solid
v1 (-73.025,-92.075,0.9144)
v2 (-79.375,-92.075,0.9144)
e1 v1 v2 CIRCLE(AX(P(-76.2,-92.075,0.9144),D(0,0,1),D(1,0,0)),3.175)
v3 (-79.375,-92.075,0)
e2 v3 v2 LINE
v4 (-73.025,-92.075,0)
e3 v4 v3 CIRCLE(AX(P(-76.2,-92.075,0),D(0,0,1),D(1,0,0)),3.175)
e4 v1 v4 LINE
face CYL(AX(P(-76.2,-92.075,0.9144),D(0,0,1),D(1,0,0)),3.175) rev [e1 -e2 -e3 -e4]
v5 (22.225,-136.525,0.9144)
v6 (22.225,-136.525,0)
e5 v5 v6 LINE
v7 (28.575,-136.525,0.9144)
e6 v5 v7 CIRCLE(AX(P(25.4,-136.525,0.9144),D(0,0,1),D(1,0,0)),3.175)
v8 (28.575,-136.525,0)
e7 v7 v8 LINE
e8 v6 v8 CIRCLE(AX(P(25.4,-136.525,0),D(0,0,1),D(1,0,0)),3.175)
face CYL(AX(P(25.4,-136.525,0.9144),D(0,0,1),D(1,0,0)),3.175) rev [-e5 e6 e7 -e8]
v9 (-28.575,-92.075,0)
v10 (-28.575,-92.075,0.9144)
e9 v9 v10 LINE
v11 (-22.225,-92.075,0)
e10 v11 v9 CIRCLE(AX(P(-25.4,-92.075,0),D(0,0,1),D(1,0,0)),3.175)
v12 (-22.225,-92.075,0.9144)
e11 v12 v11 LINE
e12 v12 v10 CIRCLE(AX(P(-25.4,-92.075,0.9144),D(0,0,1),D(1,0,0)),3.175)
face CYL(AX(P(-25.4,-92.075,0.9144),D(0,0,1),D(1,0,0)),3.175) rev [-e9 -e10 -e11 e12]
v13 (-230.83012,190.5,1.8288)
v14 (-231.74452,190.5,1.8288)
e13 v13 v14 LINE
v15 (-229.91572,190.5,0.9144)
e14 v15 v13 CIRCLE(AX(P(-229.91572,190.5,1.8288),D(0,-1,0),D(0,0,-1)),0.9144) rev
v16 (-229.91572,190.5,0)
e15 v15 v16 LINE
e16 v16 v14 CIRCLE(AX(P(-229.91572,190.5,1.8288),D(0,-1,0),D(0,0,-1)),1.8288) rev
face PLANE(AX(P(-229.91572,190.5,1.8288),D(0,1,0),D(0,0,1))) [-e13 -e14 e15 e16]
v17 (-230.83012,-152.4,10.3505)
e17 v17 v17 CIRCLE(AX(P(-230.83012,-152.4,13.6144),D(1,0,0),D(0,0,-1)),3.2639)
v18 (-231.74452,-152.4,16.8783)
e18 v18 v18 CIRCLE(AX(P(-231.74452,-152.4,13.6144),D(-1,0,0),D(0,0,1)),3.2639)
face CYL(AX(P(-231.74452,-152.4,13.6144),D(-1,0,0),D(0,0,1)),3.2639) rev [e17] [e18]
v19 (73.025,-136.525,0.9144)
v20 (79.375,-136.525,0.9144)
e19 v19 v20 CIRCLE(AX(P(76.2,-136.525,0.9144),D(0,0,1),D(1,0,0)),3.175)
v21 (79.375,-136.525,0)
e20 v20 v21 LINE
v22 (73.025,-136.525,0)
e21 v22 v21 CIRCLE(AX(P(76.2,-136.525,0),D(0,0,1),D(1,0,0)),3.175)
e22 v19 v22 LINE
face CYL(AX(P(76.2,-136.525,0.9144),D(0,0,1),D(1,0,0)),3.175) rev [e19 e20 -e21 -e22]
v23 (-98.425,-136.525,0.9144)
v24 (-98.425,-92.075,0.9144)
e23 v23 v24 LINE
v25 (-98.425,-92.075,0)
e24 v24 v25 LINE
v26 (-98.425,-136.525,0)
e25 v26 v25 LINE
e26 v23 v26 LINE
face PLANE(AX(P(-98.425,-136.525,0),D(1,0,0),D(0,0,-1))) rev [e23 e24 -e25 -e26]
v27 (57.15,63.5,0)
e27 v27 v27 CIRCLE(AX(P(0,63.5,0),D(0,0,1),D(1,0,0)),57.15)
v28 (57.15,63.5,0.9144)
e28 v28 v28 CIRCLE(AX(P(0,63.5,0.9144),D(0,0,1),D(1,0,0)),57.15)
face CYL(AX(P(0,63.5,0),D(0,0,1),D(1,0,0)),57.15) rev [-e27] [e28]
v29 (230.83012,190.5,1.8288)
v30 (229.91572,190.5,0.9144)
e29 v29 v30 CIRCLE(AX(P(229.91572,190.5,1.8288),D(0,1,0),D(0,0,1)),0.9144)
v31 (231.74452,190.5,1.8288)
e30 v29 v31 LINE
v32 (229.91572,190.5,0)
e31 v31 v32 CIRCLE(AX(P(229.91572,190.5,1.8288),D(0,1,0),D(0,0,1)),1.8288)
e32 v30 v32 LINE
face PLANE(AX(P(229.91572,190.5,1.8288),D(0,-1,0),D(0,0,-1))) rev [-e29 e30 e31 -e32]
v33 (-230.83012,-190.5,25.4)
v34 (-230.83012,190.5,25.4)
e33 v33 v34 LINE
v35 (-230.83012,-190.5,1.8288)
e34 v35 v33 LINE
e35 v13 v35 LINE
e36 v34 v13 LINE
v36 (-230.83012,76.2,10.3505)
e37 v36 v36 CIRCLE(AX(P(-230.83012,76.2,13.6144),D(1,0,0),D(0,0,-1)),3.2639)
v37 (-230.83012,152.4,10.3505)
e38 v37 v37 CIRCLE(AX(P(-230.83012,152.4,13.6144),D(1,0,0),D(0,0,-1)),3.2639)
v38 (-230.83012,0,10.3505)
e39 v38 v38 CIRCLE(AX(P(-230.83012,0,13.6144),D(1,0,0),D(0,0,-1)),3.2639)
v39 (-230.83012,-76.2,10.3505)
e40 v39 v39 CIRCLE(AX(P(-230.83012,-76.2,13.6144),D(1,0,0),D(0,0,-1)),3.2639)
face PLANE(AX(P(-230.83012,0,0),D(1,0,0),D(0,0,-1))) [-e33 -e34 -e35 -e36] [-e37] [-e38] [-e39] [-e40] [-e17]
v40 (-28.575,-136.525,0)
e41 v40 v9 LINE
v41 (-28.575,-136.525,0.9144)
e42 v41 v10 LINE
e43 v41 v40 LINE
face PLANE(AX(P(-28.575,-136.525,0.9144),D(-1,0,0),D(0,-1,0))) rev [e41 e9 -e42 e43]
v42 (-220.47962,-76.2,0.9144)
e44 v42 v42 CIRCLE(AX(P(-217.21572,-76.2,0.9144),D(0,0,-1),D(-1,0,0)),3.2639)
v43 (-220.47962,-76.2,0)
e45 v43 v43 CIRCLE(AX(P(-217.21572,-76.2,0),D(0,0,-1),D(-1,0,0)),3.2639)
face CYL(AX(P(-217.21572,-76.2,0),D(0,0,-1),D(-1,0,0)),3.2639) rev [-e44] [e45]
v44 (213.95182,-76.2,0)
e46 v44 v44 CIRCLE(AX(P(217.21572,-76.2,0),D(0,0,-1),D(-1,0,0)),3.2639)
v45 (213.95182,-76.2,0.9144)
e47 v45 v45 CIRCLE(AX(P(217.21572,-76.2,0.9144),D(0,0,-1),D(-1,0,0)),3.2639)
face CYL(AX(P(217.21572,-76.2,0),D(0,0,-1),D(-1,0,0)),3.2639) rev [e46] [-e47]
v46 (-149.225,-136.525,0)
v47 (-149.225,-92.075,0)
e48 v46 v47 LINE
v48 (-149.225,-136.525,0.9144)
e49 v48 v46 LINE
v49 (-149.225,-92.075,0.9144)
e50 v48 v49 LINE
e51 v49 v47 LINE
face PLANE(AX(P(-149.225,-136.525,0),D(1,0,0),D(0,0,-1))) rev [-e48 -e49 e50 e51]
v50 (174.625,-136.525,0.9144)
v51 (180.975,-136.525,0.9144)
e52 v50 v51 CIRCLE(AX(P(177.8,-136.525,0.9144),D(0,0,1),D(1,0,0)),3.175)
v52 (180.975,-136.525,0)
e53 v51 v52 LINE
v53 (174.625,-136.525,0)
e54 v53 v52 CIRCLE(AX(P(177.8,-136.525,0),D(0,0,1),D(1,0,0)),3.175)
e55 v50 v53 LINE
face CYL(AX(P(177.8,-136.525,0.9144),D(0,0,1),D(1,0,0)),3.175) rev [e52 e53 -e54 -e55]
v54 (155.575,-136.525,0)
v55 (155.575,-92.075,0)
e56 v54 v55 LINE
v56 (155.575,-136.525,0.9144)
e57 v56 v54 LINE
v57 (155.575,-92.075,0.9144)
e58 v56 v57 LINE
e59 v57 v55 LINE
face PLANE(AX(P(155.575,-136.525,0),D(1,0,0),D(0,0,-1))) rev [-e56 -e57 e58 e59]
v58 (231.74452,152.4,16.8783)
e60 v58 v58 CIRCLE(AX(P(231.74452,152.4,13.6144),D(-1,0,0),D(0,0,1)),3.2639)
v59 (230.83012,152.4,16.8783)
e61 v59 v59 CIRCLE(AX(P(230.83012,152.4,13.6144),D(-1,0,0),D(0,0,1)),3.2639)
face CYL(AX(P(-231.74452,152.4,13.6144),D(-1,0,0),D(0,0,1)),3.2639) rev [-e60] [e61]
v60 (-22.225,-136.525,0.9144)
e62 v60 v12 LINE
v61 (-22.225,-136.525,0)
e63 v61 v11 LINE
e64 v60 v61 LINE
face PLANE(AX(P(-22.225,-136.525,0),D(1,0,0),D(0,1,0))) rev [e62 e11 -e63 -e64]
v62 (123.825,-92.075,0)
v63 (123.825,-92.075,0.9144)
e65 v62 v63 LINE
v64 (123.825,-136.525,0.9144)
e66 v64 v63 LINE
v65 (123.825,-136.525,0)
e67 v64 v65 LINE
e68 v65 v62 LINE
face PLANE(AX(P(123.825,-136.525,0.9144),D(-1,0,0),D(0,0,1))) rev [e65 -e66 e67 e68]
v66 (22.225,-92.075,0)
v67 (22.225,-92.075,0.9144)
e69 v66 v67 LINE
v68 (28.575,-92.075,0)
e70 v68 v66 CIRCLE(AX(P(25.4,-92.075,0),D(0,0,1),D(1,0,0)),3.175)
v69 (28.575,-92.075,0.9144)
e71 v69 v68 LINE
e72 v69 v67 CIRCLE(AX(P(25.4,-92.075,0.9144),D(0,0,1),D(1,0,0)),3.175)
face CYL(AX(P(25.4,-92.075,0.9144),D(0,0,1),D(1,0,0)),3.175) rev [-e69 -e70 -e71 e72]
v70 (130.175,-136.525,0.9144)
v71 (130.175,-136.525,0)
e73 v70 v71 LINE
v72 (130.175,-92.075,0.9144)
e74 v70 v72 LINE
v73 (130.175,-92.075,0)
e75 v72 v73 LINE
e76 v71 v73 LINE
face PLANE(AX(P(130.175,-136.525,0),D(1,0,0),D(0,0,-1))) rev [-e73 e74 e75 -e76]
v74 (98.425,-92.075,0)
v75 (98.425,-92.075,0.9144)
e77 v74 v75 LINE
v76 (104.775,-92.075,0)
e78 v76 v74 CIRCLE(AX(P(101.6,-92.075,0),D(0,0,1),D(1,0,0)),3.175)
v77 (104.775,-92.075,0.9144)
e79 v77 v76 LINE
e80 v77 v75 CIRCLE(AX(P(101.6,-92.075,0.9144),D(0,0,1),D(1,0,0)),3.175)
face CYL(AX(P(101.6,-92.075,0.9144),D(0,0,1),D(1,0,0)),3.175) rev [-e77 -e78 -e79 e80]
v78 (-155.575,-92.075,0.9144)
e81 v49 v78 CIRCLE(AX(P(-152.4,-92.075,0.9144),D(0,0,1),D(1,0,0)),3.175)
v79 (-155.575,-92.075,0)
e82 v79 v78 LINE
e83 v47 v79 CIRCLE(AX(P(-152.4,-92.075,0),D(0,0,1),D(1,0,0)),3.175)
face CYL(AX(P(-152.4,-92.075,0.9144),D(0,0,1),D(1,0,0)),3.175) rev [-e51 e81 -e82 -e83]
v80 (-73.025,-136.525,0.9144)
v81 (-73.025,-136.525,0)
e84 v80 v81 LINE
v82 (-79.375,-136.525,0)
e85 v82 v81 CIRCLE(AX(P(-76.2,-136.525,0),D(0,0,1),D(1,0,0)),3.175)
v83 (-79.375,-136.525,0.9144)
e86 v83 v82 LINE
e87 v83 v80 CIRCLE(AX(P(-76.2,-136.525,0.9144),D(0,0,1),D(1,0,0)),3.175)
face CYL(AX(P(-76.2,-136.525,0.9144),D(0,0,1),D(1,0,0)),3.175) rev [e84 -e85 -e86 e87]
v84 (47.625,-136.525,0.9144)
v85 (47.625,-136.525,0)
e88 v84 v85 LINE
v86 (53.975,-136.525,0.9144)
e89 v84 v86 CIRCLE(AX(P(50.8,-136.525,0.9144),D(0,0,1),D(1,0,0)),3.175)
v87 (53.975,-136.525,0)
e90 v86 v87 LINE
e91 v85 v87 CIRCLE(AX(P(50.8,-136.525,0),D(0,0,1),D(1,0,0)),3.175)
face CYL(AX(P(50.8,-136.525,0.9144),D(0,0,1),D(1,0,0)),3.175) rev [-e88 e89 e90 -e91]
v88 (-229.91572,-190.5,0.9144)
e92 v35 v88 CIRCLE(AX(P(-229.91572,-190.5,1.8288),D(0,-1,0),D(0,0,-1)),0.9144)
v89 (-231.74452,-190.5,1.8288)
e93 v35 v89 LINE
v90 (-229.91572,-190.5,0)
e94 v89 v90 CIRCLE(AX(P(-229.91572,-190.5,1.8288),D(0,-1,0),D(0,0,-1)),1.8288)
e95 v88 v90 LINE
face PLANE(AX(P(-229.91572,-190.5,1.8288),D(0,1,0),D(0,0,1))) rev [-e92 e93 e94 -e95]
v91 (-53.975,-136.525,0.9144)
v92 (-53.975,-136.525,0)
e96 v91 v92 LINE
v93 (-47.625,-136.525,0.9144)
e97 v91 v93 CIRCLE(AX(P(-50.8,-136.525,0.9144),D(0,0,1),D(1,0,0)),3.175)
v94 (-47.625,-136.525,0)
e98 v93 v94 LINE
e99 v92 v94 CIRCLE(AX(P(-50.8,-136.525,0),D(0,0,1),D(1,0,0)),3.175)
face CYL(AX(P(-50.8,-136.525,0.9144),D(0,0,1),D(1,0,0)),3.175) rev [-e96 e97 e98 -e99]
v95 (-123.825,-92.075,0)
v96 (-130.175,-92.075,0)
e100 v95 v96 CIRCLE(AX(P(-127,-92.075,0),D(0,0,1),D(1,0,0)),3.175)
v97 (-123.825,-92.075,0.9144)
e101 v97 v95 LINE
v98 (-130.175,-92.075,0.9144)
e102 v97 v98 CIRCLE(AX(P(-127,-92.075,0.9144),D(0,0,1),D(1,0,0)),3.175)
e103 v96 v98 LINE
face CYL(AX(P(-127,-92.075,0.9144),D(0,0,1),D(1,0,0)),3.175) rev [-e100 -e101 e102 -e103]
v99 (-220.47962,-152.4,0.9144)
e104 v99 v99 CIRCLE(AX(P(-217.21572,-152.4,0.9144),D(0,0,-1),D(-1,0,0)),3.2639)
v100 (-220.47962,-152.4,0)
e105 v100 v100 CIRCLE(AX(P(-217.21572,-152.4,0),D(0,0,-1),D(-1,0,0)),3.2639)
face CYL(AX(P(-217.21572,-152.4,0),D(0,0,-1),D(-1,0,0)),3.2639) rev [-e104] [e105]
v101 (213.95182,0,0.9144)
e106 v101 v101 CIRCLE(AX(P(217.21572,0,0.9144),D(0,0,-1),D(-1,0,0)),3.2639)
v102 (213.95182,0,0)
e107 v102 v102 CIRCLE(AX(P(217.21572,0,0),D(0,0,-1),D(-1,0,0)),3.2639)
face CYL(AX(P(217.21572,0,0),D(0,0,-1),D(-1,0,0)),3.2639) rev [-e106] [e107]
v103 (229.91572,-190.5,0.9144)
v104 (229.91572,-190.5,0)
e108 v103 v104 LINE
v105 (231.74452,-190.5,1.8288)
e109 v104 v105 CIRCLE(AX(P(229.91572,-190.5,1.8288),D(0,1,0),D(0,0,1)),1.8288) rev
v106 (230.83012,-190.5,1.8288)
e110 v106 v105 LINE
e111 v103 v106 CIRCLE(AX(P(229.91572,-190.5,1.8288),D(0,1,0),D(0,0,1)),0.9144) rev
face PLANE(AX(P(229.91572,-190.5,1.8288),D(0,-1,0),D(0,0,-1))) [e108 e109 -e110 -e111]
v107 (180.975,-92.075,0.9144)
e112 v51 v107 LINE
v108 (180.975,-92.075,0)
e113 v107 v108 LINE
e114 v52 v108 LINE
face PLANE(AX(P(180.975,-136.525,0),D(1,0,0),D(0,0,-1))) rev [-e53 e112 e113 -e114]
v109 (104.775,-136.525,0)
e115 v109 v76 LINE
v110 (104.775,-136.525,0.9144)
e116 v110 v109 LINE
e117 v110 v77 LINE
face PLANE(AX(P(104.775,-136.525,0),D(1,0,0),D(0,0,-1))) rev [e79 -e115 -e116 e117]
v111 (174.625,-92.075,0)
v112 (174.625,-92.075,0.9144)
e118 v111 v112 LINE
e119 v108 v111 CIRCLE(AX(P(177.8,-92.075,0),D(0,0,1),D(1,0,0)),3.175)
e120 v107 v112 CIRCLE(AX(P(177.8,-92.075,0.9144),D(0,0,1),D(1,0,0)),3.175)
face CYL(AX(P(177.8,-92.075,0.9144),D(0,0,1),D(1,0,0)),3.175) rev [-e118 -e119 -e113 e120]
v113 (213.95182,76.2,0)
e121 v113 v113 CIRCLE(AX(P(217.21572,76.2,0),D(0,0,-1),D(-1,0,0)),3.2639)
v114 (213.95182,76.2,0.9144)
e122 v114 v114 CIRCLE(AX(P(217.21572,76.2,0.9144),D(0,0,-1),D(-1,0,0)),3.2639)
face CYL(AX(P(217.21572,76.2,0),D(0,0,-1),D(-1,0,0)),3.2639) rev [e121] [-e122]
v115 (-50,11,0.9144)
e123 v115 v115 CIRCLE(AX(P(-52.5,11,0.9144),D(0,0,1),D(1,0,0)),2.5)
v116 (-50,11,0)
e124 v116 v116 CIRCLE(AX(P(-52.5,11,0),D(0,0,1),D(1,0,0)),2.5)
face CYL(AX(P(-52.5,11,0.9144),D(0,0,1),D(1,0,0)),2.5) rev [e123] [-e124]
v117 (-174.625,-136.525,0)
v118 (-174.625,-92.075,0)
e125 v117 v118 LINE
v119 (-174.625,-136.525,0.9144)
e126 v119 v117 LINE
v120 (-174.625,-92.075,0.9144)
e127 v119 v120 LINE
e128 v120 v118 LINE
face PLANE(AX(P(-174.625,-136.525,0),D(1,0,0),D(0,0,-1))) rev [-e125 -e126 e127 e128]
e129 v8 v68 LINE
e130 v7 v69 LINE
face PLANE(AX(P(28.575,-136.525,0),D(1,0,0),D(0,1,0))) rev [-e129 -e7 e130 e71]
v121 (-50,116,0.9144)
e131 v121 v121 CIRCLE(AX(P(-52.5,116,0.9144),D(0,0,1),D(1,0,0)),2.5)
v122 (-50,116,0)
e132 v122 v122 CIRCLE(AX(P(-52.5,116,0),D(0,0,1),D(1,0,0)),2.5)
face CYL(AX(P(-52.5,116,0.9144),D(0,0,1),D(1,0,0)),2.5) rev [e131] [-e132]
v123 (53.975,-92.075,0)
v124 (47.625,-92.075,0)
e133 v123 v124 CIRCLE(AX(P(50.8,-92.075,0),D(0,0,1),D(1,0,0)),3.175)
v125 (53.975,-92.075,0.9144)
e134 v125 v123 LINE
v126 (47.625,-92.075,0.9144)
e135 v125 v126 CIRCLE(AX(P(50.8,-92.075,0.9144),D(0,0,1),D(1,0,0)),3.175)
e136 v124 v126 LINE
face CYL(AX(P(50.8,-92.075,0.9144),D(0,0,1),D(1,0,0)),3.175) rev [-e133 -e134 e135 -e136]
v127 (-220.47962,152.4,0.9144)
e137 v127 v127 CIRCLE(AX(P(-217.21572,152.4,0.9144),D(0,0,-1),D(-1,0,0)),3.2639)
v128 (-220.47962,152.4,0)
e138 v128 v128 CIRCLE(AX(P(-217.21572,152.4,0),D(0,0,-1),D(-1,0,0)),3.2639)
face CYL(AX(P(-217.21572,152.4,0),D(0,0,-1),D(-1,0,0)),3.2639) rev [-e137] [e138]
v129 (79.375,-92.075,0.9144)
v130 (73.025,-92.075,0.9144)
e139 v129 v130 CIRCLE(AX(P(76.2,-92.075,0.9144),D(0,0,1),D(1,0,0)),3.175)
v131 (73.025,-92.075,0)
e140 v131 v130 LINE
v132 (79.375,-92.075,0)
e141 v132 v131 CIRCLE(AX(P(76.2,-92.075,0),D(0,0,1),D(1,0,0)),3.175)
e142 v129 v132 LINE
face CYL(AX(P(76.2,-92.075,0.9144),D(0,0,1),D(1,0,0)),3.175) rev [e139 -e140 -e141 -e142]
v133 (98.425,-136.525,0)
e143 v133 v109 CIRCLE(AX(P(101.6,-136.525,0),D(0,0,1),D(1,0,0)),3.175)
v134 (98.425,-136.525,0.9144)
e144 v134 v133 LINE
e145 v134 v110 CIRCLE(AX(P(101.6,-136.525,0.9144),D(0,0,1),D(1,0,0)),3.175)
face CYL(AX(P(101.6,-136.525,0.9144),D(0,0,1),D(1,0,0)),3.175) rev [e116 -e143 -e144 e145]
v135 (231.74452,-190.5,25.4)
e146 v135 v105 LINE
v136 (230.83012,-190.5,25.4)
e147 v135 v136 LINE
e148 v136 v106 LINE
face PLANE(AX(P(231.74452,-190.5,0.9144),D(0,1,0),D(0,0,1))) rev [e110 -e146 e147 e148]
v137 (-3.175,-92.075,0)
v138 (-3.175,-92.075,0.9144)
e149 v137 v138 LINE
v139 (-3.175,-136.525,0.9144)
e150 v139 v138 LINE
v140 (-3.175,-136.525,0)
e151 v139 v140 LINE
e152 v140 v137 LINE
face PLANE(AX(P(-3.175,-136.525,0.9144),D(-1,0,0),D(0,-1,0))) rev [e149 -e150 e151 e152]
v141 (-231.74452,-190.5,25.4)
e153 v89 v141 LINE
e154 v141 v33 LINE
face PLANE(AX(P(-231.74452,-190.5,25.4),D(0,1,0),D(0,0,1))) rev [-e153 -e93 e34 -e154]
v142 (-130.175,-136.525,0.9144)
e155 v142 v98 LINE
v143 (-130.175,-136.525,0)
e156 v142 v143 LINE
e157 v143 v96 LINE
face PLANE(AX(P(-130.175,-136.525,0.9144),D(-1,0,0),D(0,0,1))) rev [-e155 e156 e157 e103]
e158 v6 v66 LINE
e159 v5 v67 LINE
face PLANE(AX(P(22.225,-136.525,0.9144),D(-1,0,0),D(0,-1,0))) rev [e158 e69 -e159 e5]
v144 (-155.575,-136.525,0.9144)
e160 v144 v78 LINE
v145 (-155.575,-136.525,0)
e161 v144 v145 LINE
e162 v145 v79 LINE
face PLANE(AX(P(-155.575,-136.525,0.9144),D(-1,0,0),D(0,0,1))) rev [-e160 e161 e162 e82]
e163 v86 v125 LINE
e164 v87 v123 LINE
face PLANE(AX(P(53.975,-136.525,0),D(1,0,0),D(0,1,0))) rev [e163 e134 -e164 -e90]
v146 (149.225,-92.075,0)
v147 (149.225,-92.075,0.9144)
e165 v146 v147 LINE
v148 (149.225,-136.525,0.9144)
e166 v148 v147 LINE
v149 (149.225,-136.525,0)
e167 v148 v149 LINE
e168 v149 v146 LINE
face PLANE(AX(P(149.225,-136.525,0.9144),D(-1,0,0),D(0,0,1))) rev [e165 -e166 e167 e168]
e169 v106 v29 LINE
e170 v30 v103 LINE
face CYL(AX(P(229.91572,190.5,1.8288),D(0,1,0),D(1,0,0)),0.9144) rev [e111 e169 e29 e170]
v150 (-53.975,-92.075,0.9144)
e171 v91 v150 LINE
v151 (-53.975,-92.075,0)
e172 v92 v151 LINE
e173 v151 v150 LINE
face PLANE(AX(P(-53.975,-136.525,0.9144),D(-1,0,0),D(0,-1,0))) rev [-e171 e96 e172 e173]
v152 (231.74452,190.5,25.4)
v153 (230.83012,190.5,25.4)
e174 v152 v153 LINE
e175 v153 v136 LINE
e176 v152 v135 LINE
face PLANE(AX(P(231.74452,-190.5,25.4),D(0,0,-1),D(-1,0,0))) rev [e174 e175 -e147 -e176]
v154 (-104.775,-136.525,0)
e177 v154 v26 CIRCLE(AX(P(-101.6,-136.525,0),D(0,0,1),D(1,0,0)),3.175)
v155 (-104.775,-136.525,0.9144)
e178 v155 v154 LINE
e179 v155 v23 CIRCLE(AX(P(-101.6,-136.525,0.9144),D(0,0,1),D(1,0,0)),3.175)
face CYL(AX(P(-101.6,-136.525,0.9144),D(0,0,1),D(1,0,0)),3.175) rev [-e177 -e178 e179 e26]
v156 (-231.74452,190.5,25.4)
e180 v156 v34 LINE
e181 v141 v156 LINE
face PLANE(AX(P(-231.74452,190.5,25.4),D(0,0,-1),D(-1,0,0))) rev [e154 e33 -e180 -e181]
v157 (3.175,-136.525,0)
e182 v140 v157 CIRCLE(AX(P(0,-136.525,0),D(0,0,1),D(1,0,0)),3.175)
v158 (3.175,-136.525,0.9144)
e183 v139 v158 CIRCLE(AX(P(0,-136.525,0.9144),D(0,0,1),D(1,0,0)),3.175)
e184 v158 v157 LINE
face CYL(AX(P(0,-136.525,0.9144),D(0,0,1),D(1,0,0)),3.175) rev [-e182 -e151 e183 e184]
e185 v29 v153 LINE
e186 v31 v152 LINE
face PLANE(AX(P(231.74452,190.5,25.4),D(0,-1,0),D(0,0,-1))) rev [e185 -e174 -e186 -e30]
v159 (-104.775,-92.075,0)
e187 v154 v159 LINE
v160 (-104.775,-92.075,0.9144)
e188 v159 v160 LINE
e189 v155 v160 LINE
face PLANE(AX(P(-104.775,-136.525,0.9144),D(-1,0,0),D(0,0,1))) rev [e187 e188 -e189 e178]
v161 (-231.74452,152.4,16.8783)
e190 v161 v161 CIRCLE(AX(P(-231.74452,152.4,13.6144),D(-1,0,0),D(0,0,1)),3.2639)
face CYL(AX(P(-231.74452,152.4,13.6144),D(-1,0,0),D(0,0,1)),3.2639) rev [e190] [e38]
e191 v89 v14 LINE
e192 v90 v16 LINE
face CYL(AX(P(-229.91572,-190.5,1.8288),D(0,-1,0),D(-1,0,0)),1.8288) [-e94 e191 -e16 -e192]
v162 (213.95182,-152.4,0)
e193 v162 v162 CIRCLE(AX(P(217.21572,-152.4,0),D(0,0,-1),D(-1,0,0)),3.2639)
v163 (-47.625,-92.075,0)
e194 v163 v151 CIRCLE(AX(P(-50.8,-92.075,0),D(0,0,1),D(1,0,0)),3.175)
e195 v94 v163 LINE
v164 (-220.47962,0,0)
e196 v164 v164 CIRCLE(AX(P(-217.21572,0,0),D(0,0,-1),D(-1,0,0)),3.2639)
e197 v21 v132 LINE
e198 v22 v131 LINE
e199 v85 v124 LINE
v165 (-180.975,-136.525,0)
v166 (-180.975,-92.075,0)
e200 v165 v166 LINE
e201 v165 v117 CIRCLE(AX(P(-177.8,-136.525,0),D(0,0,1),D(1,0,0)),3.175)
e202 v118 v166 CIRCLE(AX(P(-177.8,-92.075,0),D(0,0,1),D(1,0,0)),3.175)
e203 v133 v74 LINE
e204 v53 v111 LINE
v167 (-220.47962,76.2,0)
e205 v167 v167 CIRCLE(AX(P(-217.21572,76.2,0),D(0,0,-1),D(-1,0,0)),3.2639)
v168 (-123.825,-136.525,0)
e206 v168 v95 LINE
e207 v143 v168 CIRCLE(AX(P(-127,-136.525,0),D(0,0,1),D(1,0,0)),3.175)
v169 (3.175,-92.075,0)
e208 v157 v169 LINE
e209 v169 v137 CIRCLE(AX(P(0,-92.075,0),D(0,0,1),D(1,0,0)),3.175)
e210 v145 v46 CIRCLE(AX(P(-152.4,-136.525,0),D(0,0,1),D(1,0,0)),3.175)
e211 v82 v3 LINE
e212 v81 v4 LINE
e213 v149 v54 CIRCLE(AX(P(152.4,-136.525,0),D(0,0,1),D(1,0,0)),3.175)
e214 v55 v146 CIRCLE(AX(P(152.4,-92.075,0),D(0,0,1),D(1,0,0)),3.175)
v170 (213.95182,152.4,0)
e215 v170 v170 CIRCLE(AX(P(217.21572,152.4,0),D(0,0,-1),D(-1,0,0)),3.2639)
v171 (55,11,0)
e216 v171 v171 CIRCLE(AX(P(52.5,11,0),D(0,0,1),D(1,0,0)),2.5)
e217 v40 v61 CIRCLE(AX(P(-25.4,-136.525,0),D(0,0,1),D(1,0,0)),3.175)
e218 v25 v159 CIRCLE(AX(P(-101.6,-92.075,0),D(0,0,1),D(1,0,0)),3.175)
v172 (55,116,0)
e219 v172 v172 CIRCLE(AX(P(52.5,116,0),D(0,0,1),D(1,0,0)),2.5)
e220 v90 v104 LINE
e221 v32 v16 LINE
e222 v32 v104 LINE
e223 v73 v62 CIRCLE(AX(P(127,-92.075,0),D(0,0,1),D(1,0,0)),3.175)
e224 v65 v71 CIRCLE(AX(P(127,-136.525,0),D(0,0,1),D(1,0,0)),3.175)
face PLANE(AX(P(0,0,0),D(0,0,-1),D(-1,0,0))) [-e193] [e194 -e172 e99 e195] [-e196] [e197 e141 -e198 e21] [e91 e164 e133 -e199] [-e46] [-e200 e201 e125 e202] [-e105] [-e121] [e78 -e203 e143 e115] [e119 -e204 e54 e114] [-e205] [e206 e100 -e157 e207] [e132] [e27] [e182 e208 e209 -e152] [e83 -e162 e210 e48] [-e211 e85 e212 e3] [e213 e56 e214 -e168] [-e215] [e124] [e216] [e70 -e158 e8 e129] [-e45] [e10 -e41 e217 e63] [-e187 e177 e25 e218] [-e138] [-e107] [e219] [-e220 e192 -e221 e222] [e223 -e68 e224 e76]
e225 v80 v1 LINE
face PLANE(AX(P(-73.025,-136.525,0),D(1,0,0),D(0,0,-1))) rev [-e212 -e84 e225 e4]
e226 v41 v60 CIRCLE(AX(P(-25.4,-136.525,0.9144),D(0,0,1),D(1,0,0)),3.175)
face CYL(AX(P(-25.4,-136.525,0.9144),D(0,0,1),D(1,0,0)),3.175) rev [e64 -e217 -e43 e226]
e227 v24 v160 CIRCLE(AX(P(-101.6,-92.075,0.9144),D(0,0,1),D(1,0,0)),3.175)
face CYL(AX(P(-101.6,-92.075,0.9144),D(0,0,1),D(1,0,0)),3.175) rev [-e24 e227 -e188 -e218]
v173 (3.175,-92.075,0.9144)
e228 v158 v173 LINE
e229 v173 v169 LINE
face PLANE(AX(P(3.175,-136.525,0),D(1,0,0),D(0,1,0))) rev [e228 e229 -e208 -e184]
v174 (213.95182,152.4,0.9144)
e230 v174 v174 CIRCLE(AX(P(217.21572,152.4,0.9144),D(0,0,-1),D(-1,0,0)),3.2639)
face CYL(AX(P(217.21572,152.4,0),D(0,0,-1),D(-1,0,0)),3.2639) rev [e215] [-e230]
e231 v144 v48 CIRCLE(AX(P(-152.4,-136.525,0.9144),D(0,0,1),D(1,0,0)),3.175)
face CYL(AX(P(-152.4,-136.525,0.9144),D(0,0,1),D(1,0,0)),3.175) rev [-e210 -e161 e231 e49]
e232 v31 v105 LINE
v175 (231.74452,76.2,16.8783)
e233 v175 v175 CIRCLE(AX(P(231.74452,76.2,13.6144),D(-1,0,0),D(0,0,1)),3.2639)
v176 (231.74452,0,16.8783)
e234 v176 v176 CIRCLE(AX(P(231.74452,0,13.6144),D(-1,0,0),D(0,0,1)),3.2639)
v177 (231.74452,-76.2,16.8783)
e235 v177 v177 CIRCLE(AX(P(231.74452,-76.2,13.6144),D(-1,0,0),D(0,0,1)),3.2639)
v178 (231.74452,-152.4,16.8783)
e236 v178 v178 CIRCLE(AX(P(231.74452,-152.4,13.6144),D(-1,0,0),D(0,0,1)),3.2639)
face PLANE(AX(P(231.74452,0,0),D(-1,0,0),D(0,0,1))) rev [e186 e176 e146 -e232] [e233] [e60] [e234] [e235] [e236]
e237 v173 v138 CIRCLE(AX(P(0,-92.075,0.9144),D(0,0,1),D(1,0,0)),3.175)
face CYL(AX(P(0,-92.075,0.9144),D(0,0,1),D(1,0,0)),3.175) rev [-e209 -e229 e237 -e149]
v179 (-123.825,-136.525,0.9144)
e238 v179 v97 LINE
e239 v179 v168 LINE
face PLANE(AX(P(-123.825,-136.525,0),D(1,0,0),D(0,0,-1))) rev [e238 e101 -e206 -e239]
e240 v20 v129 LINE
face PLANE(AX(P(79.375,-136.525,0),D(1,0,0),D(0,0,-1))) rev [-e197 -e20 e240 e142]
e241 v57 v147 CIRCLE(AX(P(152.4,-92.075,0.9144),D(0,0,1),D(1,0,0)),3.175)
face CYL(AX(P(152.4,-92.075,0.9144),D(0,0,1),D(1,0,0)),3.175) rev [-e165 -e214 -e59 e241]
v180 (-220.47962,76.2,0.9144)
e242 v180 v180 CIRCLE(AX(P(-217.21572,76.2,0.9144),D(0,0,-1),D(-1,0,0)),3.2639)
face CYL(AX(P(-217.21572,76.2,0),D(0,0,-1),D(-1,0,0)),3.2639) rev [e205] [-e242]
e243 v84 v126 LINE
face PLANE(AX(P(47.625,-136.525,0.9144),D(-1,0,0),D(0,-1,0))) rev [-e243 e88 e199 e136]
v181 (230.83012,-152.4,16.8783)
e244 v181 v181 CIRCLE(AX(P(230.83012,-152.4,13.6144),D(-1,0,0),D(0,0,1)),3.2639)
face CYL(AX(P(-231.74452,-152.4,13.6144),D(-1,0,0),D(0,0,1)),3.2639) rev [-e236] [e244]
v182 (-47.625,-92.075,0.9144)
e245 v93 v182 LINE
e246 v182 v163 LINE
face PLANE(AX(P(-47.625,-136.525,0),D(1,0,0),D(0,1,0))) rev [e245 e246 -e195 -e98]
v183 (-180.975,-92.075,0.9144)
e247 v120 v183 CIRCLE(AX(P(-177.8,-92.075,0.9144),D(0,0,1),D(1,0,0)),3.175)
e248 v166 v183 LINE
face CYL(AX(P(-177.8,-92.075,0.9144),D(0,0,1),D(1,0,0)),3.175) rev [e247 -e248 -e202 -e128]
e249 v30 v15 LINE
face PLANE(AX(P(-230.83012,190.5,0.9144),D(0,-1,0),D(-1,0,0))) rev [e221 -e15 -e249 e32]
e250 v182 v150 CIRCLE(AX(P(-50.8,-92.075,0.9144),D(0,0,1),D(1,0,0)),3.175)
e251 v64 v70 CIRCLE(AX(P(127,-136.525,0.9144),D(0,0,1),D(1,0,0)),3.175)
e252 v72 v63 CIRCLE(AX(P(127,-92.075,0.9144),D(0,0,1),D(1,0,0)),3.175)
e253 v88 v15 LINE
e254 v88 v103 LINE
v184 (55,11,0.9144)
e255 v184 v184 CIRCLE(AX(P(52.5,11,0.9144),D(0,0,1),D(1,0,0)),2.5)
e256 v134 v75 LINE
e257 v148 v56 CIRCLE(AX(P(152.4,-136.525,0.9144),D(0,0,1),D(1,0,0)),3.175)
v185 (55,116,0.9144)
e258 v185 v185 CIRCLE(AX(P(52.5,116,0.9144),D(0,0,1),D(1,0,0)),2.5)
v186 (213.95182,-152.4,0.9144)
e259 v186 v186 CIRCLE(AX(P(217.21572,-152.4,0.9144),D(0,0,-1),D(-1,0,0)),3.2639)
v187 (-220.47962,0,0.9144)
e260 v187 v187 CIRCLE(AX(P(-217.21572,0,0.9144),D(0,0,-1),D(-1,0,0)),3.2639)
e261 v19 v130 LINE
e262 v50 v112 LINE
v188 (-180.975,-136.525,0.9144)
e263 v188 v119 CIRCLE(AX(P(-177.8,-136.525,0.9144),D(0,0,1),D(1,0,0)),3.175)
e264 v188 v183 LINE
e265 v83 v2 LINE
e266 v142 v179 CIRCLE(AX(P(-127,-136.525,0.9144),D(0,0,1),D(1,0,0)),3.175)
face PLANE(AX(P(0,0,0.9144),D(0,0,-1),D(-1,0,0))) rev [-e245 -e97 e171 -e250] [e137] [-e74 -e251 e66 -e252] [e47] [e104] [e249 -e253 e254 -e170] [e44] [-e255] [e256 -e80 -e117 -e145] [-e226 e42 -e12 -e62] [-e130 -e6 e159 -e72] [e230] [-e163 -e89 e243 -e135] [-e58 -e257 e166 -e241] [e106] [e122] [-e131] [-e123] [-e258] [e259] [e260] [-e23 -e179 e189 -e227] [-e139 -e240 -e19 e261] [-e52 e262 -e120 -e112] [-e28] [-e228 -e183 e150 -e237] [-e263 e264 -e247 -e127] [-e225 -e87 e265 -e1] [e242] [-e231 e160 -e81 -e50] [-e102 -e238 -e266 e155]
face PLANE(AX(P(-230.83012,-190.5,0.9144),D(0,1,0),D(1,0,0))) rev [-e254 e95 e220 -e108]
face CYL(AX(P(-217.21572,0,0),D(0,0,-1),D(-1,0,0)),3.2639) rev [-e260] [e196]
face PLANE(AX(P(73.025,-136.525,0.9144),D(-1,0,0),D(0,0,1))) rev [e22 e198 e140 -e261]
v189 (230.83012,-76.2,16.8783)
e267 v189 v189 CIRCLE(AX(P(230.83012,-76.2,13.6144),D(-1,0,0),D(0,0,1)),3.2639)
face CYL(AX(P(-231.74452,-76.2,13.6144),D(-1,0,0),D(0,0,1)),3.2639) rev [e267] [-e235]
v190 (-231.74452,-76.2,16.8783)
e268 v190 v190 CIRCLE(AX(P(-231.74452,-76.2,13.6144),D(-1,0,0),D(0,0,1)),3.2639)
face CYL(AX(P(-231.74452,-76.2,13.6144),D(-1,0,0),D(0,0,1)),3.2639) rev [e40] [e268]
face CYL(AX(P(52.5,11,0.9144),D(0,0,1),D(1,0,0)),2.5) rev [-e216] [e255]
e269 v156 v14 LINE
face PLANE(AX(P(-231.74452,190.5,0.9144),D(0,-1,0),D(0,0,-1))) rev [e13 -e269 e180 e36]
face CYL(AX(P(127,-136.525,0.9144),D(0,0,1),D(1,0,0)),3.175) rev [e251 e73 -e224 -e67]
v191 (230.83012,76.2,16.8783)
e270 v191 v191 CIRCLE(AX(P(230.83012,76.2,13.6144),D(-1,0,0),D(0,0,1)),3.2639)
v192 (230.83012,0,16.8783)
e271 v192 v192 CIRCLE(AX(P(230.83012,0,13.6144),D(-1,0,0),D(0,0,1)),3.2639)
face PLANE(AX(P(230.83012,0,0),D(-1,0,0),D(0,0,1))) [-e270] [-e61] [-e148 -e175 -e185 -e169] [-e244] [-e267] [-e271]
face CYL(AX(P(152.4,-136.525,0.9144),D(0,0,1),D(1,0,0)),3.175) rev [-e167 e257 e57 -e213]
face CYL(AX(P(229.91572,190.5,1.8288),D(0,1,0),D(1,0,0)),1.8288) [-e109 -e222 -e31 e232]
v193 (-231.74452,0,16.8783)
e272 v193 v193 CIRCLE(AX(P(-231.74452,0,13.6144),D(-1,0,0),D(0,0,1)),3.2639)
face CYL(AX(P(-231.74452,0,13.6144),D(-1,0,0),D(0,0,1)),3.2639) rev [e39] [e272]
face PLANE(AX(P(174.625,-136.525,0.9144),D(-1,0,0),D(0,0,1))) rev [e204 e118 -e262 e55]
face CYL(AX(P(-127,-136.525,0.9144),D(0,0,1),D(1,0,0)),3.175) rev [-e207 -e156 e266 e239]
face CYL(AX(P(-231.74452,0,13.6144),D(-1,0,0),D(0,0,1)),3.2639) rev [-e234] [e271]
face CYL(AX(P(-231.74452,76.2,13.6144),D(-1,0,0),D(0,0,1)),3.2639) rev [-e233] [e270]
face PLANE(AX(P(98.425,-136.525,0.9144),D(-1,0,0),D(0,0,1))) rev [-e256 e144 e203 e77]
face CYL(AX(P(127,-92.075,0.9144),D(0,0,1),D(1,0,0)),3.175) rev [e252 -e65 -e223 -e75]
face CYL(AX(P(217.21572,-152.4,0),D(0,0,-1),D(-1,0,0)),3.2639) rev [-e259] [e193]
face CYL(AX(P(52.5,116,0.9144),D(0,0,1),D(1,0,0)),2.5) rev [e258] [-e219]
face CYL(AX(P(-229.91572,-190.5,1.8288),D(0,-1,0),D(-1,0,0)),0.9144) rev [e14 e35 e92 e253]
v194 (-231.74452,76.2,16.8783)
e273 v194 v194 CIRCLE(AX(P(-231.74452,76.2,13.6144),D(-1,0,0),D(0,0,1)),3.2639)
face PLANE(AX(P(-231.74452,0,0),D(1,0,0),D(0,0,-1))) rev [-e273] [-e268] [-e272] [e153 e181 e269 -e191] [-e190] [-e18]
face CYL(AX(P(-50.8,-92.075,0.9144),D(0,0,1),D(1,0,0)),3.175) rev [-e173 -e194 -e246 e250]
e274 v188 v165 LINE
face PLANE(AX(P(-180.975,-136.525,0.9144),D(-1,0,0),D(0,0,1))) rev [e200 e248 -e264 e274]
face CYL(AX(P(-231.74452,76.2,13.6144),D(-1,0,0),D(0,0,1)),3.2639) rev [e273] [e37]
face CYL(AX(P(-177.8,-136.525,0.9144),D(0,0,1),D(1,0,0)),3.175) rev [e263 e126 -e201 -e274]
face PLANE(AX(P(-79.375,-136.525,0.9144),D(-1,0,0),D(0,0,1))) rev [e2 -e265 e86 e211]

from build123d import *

# Parameters (mm, degrees)
SKETCH1_W                       = 461.66024
SKETCH1_H                       = 381
BOSS_EXTRUDE1_DEPTH             = 0.9144
EDGE_FLANGE1_STRIP_W            = 5.4864
EDGE_FLANGE1_STRIP_H            = 0.9144
EDGE_FLANGE1_STRIP_CUT_DEPTH    = 381
EDGE_FLANGE1_DEPTH              = 381
EDGE_FLANGE2_STRIP_W            = 5.4864
EDGE_FLANGE2_STRIP_H            = 0.9144
EDGE_FLANGE2_STRIP_CUT_DEPTH    = 381
EDGE_FLANGE2_DEPTH              = 381
F_0_257_DIAMETER_HOLE1_D        = 6.5278
F_0_257_DIAMETER_HOLE2_D        = 6.5278
SKETCH17_R                      = 57.15
CUT_EXTRUDE1_DEPTH              = 301.990559914
F_5_0_5_DIAMETER_HOLE1_D        = 5
F_1_4_0_25_DIAMETER_SLOT1_DEPTH = 0.9144
LPATTERN1_COUNT                 = 8
LPATTERN1_PITCH                 = 25.4
LPATTERN1_COL_COUNT             = 8
LPATTERN1_COL_PITCH             = 25.4


# Read off the part's stored shape, not the designer's step: 1/4 (0.25) Diameter Slot1
# Sheet-metal steps are written as plain solids
with BuildPart() as part:
    # Sketch1 → Boss-Extrude1 (new body)
    with BuildSketch(Plane.XY):
        Rectangle(SKETCH1_W, SKETCH1_H)
    extrude(amount=BOSS_EXTRUDE1_DEPTH)

    # Edge-Flange1 strip (across the edge) → Edge-Flange1 strip cut (cut)
    with BuildSketch(Plane(origin=(230.83012, -190.5, 0.9144), x_dir=(-1, 0, 0), z_dir=(0, 1, 0))):
        with Locations((-1.8288, -0.4572)):
            Rectangle(EDGE_FLANGE1_STRIP_W, EDGE_FLANGE1_STRIP_H)
    extrude(amount=EDGE_FLANGE1_STRIP_CUT_DEPTH, mode=Mode.SUBTRACT)

    # Edge-Flange1 section (across the edge) → Edge-Flange1 (add)
    with BuildSketch(Plane(origin=(230.83012, -190.5, 0.9144), x_dir=(-1, 0, 0), z_dir=(0, 1, 0))):
        with BuildLine():
            Line((-0.9144, 0.9144), (-0.9144, 24.4856))
            Line((-0.9144, 24.4856), (0, 24.4856))
            Line((0, 24.4856), (0, 0.9144))
            ThreePointArc((0, 0.9144), (0.267821559, 0.267821559), (0.9144, 0))
            Line((0.9144, 0), (0.9144, -0.9144))
            ThreePointArc((0.9144, -0.9144), (-0.378756881, -0.378756881), (-0.9144, 0.9144))
        make_face()
    extrude(amount=EDGE_FLANGE1_DEPTH)

    # Edge-Flange2 strip (across the edge) → Edge-Flange2 strip cut (cut)
    with BuildSketch(Plane(origin=(-230.83012, 190.5, 0.9144), x_dir=(1, 0, 0), z_dir=(0, -1, 0))):
        with Locations((-1.8288, -0.4572)):
            Rectangle(EDGE_FLANGE2_STRIP_W, EDGE_FLANGE2_STRIP_H)
    extrude(amount=EDGE_FLANGE2_STRIP_CUT_DEPTH, mode=Mode.SUBTRACT)

    # Edge-Flange2 section (across the edge) → Edge-Flange2 (add)
    with BuildSketch(Plane(origin=(-230.83012, 190.5, 0.9144), x_dir=(1, 0, 0), z_dir=(0, -1, 0))):
        with BuildLine():
            Line((-0.9144, 0.9144), (-0.9144, 24.4856))
            Line((-0.9144, 24.4856), (0, 24.4856))
            Line((0, 24.4856), (0, 0.9144))
            ThreePointArc((0, 0.9144), (0.267821559, 0.267821559), (0.9144, 0))
            Line((0.9144, 0), (0.9144, -0.9144))
            ThreePointArc((0.9144, -0.9144), (-0.378756881, -0.378756881), (-0.9144, 0.9144))
        make_face()
    extrude(amount=EDGE_FLANGE2_DEPTH)

    # F (0.257) Diameter Hole1 (through all)
    with Locations(Plane.ZY.offset(231.74452)):
        with Locations((13.6144, 76.2), (13.6144, 0), (13.6144, -76.2), (13.6144, -152.4), (13.6144, 152.4)):
            Hole(F_0_257_DIAMETER_HOLE1_D / 2)

    # F (0.257) Diameter Hole2 (through all)
    with Locations(Plane(origin=(0, 0, 0), x_dir=(-1, 0, 0), z_dir=(0, 0, -1))):
        with Locations((217.21572, 152.4), (-217.21572, 152.4), (-217.21572, 76.2), (-217.21572, 0), (-217.21572, -76.2), (-217.21572, -152.4), (217.21572, -152.4), (217.21572, -76.2), (217.21572, 0), (217.21572, 76.2)):
            Hole(F_0_257_DIAMETER_HOLE2_D / 2)

    # Sketch17 → Cut-Extrude1 (cut, through all)
    with BuildSketch(Plane.XY.offset(0.9144)):
        with Locations((0, 63.5)):
            Circle(SKETCH17_R)
    extrude(amount=-CUT_EXTRUDE1_DEPTH, mode=Mode.SUBTRACT)

    # Ø5.0 (5) Diameter Hole1 (through all)
    with Locations(Plane.XY.offset(0.9144)):
        with Locations((0, 63.5), (52.5, 116), (-52.5, 11), (-52.5, 116), (52.5, 11)):
            Hole(F_5_0_5_DIAMETER_HOLE1_D / 2)

    # 1/4 (0.25) Diameter Slot1 outline → 1/4 (0.25) Diameter Slot1 (cut)
    with BuildSketch(Plane.XY):
        with BuildLine():
            Line((3.175, -136.525), (3.175, -92.075))
            ThreePointArc((3.175, -92.075), (0, -88.9), (-3.175, -92.075))
            Line((-3.175, -92.075), (-3.175, -136.525))
            ThreePointArc((-3.175, -136.525), (0, -139.7), (3.175, -136.525))
        make_face()
    f_1_4_0_25_diameter_slot1 = extrude(amount=F_1_4_0_25_DIAMETER_SLOT1_DEPTH, mode=Mode.SUBTRACT)

    # LPattern1: 1/4 (0.25) Diameter Slot1 ×8
    with Locations(*[(-i * LPATTERN1_PITCH, 0, 0) for i in range(1, LPATTERN1_COUNT)]):
        add(f_1_4_0_25_diameter_slot1, mode=Mode.SUBTRACT)

    # LPattern1 col: 1/4 (0.25) Diameter Slot1 ×8
    with Locations(*[(i * LPATTERN1_COL_PITCH, 0, 0) for i in range(1, LPATTERN1_COL_COUNT)]):
        add(f_1_4_0_25_diameter_slot1, mode=Mode.SUBTRACT)


solid = part.part
